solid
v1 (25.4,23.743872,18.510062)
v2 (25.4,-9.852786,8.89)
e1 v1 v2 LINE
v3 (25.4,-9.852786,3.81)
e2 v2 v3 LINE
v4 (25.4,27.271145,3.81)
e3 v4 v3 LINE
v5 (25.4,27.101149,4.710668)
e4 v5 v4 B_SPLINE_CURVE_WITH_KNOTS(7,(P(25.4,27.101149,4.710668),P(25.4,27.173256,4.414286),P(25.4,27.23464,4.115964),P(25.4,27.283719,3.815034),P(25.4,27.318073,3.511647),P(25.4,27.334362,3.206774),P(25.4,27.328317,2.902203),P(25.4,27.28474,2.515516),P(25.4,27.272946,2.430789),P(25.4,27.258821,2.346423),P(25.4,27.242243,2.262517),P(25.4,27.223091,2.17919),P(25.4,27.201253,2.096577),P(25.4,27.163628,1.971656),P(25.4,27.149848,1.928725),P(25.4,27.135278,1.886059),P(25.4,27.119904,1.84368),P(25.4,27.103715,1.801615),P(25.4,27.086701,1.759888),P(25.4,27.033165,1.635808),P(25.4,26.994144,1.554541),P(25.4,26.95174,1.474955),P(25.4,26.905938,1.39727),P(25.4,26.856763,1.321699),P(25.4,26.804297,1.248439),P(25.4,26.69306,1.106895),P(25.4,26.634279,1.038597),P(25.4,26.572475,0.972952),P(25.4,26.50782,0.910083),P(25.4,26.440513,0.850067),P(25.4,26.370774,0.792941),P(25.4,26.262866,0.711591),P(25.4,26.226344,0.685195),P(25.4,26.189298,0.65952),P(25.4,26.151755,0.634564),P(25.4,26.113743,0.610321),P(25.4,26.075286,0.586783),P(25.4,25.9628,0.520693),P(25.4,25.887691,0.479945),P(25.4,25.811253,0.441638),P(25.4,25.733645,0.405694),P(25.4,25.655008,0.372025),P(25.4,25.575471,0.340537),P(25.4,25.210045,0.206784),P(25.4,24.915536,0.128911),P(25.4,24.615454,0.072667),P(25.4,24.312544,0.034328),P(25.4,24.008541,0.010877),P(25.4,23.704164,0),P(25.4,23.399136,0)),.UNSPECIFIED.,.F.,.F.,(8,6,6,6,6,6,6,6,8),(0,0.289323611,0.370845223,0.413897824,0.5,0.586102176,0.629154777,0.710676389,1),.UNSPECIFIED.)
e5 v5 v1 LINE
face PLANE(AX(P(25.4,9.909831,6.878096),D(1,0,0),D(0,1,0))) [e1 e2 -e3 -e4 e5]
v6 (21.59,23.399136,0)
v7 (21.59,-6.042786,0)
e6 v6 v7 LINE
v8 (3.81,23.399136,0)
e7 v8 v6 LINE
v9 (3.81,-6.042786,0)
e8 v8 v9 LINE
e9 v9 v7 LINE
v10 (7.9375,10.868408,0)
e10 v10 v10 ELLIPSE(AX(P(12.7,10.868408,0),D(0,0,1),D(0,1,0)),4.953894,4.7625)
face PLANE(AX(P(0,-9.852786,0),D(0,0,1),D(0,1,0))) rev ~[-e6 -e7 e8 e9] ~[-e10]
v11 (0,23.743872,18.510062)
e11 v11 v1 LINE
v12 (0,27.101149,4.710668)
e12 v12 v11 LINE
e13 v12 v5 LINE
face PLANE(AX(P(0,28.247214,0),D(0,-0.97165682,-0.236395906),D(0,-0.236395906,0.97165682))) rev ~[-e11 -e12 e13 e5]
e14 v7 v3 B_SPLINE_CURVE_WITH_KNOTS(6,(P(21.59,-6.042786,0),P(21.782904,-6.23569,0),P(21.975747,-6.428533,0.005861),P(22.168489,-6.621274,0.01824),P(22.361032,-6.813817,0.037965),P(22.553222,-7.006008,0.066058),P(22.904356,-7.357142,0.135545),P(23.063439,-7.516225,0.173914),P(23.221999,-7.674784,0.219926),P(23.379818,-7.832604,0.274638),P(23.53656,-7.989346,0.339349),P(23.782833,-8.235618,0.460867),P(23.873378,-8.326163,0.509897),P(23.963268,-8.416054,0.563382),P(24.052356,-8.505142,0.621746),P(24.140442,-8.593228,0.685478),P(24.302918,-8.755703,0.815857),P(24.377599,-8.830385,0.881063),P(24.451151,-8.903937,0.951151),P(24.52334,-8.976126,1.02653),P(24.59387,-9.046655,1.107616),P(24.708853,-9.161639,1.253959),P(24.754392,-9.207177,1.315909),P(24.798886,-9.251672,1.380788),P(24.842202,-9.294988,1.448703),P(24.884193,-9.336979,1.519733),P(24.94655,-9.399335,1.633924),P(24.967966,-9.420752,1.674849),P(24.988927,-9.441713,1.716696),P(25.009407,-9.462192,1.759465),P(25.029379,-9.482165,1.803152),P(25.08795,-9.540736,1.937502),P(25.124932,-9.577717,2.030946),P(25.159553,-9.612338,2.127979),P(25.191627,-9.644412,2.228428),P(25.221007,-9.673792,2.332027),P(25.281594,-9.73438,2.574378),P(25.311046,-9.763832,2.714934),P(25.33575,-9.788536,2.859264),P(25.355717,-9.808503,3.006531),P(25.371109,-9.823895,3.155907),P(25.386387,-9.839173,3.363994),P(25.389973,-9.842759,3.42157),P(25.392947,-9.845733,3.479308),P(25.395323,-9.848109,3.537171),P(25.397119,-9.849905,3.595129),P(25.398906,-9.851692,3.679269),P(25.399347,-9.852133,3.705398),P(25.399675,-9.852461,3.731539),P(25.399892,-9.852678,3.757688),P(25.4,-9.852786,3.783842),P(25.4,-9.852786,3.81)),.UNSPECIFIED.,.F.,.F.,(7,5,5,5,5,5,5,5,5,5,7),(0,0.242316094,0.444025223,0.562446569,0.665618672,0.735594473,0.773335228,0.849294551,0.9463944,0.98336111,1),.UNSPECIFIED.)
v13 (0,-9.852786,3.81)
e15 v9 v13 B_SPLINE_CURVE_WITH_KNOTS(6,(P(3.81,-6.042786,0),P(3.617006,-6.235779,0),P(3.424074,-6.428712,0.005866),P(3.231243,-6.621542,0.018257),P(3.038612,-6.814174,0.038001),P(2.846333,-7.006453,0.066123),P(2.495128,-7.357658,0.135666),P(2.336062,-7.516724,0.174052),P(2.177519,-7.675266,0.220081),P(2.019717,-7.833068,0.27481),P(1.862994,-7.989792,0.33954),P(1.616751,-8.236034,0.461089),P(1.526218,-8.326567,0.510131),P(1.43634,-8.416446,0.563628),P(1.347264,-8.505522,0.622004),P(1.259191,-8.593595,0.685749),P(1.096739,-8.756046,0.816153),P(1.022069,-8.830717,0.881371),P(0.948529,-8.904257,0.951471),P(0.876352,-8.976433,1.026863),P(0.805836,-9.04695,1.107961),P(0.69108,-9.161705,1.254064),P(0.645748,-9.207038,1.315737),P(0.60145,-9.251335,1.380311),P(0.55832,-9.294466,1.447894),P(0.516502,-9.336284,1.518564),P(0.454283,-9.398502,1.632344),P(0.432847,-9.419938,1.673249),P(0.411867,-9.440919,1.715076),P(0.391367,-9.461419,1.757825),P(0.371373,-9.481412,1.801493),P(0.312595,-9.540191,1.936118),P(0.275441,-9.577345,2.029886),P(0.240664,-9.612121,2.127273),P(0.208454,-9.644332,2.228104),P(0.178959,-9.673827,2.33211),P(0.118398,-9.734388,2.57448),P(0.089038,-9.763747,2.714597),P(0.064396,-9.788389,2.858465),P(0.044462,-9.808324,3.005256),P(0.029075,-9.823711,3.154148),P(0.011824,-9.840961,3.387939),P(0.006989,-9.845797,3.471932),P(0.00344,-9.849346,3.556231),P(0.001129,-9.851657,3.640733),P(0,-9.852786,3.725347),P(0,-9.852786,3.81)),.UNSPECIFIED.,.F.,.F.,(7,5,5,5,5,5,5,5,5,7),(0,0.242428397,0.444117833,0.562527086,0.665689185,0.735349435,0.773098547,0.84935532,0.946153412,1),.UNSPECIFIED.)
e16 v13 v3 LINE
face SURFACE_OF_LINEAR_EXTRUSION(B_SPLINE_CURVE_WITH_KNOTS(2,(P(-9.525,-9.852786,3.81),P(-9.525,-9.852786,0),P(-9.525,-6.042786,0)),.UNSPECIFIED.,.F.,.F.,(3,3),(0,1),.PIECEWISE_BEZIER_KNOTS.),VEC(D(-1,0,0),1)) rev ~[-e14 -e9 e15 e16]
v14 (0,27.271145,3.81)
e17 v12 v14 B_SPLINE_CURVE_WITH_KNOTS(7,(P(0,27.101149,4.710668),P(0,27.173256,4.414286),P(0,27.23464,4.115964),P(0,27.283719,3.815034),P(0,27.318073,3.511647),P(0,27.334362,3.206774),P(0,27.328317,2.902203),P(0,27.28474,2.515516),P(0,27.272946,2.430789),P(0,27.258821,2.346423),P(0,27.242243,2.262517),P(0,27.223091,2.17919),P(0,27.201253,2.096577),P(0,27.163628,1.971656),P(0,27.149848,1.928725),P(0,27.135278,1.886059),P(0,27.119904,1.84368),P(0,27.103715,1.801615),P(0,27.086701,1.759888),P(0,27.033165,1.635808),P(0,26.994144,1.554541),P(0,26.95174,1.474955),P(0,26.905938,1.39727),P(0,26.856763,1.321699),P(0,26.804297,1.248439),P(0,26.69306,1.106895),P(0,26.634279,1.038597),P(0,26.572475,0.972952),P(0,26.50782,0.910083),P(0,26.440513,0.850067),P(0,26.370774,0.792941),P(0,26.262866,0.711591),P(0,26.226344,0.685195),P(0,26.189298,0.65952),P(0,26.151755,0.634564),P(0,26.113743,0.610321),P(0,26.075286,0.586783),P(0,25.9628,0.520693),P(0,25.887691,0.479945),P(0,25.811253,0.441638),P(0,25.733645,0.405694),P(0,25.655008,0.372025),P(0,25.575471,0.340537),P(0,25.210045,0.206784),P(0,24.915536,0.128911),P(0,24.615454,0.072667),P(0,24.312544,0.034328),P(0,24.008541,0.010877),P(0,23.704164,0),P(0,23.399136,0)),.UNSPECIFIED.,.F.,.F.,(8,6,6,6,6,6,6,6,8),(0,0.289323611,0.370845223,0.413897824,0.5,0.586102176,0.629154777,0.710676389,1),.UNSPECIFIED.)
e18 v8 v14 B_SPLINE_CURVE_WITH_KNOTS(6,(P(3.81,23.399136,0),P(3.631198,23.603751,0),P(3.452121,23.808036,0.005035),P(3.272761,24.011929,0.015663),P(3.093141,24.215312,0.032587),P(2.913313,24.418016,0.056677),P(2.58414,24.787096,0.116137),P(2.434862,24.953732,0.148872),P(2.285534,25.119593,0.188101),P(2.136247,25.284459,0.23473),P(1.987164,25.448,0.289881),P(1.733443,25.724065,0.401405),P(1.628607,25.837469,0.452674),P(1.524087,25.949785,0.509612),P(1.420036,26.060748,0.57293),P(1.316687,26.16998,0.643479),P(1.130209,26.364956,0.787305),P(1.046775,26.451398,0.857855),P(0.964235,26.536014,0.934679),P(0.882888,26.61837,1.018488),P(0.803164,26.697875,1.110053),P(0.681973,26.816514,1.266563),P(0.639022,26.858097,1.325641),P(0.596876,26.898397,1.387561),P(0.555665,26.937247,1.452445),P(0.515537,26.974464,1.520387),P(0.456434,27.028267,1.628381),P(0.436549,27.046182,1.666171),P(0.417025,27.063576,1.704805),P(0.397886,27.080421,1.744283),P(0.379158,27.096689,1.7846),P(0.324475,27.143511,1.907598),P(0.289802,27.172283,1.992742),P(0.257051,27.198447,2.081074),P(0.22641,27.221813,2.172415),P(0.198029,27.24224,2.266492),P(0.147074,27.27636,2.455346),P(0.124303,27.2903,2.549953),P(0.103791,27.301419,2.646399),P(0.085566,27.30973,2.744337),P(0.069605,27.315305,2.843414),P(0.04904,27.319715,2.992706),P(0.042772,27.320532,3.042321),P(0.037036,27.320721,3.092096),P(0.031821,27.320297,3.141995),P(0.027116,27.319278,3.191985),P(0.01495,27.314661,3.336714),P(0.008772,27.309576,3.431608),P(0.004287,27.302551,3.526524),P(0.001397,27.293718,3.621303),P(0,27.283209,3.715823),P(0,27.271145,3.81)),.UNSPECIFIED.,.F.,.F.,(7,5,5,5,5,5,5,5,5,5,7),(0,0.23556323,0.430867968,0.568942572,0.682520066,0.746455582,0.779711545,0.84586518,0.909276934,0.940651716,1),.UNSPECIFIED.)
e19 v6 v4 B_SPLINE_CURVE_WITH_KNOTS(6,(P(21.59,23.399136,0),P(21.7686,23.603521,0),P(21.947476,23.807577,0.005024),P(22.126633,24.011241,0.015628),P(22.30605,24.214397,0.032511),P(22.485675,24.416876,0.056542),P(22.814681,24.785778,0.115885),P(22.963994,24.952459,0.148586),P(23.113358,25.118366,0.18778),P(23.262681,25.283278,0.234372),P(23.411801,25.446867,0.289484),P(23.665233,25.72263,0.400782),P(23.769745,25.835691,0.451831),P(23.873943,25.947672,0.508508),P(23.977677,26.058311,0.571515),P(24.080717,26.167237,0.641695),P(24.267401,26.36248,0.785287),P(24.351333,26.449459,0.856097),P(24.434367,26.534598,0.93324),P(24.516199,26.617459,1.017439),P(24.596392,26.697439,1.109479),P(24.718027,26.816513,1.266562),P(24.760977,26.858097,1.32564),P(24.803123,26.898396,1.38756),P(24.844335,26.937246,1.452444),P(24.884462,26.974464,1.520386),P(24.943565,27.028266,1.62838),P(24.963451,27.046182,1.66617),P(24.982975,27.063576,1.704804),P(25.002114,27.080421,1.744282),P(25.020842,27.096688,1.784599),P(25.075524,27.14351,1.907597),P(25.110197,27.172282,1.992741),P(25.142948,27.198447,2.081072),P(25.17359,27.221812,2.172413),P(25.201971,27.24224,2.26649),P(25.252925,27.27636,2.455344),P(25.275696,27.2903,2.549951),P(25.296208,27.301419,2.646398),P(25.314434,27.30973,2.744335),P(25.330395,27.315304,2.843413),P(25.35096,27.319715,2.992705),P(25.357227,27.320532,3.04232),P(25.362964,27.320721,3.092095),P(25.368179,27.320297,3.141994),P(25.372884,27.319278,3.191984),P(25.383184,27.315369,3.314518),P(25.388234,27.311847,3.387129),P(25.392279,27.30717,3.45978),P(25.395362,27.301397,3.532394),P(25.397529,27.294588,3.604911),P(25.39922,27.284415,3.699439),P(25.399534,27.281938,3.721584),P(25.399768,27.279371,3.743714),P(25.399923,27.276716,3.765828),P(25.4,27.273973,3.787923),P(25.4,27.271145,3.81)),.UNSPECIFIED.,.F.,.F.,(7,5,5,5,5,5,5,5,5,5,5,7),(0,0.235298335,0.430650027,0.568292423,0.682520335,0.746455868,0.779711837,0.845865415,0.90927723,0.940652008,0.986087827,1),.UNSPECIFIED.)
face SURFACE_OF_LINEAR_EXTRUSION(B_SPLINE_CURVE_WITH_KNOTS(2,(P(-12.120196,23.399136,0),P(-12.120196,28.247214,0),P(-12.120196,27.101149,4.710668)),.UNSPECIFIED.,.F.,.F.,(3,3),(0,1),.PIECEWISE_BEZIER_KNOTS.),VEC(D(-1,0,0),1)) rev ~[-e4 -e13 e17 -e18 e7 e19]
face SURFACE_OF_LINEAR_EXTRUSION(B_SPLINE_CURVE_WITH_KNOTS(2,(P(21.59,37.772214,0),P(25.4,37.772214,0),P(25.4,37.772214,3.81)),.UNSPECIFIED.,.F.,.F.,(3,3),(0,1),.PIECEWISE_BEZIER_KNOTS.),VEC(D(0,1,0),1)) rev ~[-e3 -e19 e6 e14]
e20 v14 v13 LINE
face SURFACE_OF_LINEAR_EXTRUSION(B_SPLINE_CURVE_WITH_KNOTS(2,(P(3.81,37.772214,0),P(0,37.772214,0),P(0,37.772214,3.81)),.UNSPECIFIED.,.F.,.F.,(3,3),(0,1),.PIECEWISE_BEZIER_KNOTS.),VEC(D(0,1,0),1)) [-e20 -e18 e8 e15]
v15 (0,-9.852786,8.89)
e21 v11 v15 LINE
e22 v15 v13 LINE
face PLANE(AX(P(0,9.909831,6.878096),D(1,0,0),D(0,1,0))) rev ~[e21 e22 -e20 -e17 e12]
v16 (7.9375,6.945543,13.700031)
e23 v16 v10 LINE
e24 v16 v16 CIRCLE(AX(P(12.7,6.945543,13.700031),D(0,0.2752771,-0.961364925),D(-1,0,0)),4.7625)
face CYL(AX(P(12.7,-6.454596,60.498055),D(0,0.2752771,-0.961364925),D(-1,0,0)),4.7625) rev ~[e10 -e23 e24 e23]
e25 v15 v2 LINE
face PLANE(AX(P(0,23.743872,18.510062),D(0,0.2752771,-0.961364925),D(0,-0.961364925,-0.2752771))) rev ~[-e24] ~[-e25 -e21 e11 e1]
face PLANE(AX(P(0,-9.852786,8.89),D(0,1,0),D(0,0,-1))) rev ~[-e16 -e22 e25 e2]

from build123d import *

# Parameters (mm, degrees)
F1_DEPTH    = 25.4
F3_T1_DEPTH = 49.6403917904
F3_T3_DEPTH = 57.15
F3_T5_DEPTH = 44.45
F4_D        = 9.525


# Not quite as in the source:
# - a fillet or chamfer that OpenCascade refuses, or shapes differently, is made with other operations: its cross-section is extruded or revolved along the edge and cut away or added


with BuildPart() as f1:
    # F0 (on Right) → F1 (new body)
    with BuildSketch(Plane.YZ):
        Polygon((28.2472143829, 0), (23.7438723809, 18.5100624206), (-9.8527856171, 8.89), (-9.8527856171, 0), align=None)
    extrude(amount=F1_DEPTH)

    # F3: fillet of radius 3.81 on 4 edges, made by hand

    # F3_s2 → F3_t1 (cut)
    with BuildSketch(Plane.YZ.offset(-12.1201958952)):
        with BuildLine():
            add(Edge.make_bspline(
                [(23.3991360248, 0), (28.2472143829, 0), (27.1011485089, 4.7106684004)],
                knots=[0, 0, 0, 1, 1, 1], degree=2, weights=[1, 1, 1]))
            Line((27.1011485089, 4.7106684004), (28.2472143829, 0))
            Line((28.2472143829, 0), (23.3991360248, 0))
        make_face()
    extrude(amount=F3_T1_DEPTH, mode=Mode.SUBTRACT)

    # F3_s4 → F3_t3 (cut)
    with BuildSketch(Plane.XZ.offset(-37.7722143829)):
        with BuildLine():
            add(Edge.make_bspline(
                [(3.81, 0), (0, 0), (0, 3.81)],
                knots=[0, 0, 0, 1, 1, 1], degree=2, weights=[1, 1, 1]))
            Line((0, 3.81), (0, 0))
            Line((0, 0), (3.81, 0))
        make_face()
        with BuildLine():
            add(Edge.make_bspline(
                [(21.59, 0), (25.4, 0), (25.4, 3.81)],
                knots=[0, 0, 0, 1, 1, 1], degree=2, weights=[1, 1, 1]))
            Line((25.4, 3.81), (25.4, 0))
            Line((25.4, 0), (21.59, 0))
        make_face()
    extrude(amount=F3_T3_DEPTH, mode=Mode.SUBTRACT)

    # F3_s6 → F3_t5 (cut)
    with BuildSketch(Plane.YZ.offset(-9.525)):
        with BuildLine():
            add(Edge.make_bspline(
                [(-9.8527856171, 3.81), (-9.8527856171, 0), (-6.0427856171, 0)],
                knots=[0, 0, 0, 1, 1, 1], degree=2, weights=[1, 1, 1]))
            Line((-6.0427856171, 0), (-9.8527856171, 0))
            Line((-9.8527856171, 0), (-9.8527856171, 3.81))
        make_face()
    extrude(amount=F3_T5_DEPTH, mode=Mode.SUBTRACT)

    # F4 (through all)
    with Locations(Plane(origin=(0, -3.0992844266, 10.8237966001), x_dir=(1, 0, 0), z_dir=(0, -0.2752771, 0.9613649246))):
        with Locations((12.7, 10.448506651)):
            Hole(F4_D / 2)


solid = f1.part
